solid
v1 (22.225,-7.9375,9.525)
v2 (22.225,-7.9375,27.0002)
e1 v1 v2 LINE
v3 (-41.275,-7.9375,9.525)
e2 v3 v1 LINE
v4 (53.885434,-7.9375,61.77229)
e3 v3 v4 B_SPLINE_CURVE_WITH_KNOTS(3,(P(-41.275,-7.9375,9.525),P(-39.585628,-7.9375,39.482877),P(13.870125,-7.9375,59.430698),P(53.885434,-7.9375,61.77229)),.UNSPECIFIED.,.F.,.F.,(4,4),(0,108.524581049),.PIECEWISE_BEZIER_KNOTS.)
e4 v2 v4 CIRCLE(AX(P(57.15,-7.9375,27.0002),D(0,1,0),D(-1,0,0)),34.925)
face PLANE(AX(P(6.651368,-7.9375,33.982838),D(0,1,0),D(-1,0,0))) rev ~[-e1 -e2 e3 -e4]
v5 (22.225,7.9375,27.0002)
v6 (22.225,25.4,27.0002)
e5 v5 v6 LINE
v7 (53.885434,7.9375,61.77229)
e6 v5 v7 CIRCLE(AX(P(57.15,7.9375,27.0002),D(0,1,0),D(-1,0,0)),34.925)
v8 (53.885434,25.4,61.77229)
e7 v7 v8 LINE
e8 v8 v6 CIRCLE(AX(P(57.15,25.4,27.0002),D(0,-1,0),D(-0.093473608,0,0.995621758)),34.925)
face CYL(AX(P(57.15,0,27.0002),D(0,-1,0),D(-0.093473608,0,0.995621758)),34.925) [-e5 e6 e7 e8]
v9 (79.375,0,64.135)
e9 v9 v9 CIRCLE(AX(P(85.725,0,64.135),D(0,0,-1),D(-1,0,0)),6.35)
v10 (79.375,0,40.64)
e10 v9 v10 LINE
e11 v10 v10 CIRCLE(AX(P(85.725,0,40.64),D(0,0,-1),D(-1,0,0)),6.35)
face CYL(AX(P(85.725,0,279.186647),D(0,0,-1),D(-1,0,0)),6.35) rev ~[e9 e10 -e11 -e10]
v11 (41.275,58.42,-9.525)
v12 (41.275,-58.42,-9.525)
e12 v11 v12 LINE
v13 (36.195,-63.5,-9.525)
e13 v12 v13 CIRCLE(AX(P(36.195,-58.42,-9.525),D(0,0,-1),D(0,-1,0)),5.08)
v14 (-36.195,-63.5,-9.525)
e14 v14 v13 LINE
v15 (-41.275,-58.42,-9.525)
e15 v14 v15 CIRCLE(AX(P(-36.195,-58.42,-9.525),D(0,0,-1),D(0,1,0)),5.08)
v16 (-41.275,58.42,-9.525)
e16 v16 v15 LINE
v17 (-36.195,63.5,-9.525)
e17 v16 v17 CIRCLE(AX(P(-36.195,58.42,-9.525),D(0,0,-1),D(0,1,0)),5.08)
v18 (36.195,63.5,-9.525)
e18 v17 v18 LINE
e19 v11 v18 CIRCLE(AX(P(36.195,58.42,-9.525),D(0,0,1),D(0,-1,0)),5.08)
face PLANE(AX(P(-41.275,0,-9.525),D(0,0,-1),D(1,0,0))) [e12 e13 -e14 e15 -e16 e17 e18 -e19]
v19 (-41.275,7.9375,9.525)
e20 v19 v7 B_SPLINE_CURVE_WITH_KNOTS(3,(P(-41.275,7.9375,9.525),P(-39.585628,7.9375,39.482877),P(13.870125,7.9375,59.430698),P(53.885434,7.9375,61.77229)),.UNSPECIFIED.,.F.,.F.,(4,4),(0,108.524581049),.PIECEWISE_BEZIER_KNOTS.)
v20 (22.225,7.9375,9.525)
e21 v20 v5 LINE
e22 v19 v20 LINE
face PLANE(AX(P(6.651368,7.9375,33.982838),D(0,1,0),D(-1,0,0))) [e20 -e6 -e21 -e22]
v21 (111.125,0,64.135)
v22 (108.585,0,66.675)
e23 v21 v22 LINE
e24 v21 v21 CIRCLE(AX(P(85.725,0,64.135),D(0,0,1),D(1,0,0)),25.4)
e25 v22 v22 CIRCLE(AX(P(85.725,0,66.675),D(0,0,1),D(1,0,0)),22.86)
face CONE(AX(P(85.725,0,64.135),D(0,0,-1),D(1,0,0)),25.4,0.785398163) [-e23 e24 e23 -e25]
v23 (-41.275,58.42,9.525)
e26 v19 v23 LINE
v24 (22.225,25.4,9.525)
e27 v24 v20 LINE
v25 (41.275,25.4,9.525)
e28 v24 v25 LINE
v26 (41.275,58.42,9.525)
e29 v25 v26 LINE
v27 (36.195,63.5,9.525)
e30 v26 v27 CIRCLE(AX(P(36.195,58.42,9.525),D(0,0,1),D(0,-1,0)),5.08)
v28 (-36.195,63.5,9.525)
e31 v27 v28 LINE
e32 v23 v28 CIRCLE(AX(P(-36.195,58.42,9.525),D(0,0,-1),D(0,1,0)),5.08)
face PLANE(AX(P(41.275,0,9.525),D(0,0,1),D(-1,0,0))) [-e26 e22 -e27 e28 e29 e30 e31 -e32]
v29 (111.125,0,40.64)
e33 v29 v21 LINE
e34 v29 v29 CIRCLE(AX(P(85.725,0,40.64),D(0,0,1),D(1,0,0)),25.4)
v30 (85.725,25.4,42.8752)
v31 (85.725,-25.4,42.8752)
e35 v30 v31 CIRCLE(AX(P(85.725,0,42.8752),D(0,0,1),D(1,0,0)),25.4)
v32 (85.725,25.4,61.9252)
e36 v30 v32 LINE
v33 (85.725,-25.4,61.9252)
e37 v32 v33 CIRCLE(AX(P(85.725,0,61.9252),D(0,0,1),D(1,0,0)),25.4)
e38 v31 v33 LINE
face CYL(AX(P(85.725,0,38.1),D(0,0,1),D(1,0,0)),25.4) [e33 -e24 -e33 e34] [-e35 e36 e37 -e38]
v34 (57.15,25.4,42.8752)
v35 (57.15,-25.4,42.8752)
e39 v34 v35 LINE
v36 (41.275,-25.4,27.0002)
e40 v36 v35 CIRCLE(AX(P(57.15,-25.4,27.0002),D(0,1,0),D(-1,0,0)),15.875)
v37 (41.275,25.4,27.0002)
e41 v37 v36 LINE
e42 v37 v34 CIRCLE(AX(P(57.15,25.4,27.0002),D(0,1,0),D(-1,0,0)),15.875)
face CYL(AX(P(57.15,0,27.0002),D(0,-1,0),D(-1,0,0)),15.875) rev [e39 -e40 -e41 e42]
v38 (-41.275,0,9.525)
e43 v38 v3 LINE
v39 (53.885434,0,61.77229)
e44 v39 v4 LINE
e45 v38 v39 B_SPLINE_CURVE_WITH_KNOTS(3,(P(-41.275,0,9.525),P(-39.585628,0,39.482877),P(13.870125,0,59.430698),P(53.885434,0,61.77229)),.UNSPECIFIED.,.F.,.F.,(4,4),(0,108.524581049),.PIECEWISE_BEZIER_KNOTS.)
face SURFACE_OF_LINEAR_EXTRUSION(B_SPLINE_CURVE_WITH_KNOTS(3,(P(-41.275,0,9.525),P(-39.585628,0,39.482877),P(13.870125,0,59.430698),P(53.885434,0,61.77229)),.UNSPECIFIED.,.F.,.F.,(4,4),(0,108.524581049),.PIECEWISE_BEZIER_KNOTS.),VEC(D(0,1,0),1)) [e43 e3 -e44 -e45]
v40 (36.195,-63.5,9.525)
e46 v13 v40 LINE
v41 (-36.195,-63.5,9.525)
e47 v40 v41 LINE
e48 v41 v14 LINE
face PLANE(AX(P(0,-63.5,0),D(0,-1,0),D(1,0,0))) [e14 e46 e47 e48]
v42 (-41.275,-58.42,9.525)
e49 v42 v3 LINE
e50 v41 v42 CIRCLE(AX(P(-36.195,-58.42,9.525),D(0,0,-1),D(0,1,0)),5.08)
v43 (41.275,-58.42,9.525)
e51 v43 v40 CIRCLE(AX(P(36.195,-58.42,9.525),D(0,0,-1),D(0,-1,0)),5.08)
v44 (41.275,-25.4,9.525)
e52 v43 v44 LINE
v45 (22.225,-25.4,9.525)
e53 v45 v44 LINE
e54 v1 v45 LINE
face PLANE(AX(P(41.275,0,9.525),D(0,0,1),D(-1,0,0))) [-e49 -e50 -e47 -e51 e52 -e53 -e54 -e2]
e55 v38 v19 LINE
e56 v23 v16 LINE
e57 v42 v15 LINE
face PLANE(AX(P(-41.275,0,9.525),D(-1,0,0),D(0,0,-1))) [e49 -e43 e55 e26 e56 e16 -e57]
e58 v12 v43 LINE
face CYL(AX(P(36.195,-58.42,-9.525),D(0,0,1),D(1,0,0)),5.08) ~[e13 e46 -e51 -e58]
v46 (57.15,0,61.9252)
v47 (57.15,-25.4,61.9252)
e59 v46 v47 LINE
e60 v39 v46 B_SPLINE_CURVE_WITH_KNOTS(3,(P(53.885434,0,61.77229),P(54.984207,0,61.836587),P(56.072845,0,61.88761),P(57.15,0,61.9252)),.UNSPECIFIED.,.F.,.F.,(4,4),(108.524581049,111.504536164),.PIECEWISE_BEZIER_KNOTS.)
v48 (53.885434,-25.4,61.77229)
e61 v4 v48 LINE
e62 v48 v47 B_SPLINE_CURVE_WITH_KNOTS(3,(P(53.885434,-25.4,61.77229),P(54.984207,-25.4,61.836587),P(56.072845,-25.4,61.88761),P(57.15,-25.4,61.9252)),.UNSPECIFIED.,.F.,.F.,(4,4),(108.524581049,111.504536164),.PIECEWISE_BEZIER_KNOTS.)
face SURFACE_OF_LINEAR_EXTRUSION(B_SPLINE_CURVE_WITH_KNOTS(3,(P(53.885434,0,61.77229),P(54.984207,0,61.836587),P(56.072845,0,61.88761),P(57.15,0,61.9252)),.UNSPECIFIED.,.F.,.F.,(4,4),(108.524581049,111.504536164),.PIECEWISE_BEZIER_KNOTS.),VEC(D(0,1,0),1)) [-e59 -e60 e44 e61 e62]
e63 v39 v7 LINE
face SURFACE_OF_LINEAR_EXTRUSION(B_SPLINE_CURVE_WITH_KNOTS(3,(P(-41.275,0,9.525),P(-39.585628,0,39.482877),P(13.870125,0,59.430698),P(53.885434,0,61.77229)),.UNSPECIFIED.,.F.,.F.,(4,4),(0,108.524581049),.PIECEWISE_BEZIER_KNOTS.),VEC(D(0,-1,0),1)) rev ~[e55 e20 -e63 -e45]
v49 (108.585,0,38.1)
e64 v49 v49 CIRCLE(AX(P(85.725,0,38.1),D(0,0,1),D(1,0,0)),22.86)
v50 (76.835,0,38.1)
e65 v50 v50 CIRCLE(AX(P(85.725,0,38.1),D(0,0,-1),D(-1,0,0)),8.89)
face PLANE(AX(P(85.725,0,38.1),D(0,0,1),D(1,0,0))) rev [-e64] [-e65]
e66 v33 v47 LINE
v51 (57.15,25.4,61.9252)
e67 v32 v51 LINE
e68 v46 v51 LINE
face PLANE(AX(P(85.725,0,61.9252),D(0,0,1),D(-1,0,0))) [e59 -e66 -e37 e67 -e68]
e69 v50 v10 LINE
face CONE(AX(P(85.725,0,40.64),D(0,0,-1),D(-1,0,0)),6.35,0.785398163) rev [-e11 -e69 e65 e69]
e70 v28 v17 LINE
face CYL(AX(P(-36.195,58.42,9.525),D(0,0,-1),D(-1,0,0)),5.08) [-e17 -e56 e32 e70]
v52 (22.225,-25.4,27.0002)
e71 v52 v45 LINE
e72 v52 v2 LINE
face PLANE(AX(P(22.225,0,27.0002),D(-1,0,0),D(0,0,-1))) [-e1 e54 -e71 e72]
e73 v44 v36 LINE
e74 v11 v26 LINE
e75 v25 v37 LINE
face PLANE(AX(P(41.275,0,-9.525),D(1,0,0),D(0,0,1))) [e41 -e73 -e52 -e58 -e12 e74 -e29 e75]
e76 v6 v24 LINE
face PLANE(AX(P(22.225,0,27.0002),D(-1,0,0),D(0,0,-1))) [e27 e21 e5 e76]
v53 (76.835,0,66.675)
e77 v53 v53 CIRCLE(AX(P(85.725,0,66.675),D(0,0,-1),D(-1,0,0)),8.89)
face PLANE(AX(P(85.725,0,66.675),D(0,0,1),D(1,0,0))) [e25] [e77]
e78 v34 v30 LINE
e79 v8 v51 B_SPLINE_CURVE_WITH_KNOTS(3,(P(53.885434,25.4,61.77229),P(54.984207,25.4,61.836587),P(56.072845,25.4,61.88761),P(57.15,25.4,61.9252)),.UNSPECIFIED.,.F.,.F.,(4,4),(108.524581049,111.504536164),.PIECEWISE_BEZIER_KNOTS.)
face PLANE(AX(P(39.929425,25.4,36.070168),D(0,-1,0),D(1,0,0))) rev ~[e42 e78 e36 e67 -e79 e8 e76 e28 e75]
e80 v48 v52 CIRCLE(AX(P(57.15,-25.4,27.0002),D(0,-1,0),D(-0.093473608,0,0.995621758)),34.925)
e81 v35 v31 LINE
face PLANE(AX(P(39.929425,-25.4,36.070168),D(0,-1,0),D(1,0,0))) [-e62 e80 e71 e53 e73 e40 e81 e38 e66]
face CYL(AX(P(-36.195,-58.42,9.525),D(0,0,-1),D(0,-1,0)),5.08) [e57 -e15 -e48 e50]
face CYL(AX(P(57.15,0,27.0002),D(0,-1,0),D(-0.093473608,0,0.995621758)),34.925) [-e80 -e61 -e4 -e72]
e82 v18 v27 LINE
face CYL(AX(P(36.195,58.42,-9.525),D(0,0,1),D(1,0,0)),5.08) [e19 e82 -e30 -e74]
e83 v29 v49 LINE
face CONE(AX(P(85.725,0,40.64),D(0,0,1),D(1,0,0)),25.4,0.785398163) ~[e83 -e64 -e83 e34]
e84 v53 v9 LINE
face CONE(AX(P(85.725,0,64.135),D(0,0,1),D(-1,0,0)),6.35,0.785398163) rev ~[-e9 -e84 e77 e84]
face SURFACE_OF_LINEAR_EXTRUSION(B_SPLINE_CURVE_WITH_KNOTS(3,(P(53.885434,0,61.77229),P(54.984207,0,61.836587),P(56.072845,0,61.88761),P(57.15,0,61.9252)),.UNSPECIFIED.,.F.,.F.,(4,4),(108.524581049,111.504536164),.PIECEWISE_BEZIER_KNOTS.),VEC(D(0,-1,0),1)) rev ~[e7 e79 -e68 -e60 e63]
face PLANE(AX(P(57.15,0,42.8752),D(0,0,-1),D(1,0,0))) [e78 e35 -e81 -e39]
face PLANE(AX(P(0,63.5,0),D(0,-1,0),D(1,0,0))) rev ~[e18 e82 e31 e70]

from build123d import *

# Parameters (mm, degrees)
F1_DEPTH = 63.5
F0_W     = 25.4
F0_H     = 19.05
F2_DEPTH = 25.4
F3_DEPTH = 7.9375
F5_R     = 5.08
F7_D     = 12.7
F8_SIZE  = 2.54


with BuildPart() as f1:
    # F0 (on Front) → F1 (new body, symmetric)
    with BuildSketch(Plane.XZ):
        Polygon((22.225, 9.525), (-41.275, 9.525), (-41.275, -9.525), (41.275, -9.525), (41.275, 9.525), align=None)
    extrude(amount=F1_DEPTH, both=True)

    # F0 (on Front) → F2 (join, symmetric)
    with BuildSketch(Plane.XZ):
        with BuildLine():
            Line((22.225, 27.0002), (22.225, 9.525))
            Line((22.225, 9.525), (41.275, 9.525))
            Line((41.275, 9.525), (41.275, 27.0002))
            ThreePointArc((41.275, 27.0002), (45.9246798487, 38.2255201513), (57.15, 42.8752))
            Line((57.15, 42.8752), (60.325, 42.8752))
            Line((60.325, 42.8752), (60.325, 61.9252))
            Line((60.325, 61.9252), (57.15, 61.9252))
            add(Edge.make_bspline(
                [(53.8854342407, 61.7722898912), (54.9842067368, 61.8365871986), (56.0728453275, 61.8876096574), (57.15, 61.9252)],
                knots=[108.5245810491, 108.5245810491, 108.5245810491, 108.5245810491, 111.5045361635, 111.5045361635, 111.5045361635, 111.5045361635], degree=3))
            ThreePointArc((53.8854342407, 61.7722898912), (31.3258777096, 50.5133948686), (22.225, 27.0002))
        make_face()
        with Locations((73.025, 52.4002)):
            Rectangle(F0_W, F0_H)
    extrude(amount=F2_DEPTH, both=True)

    # F0 (on Front) → F3 (join, symmetric)
    with BuildSketch(Plane.XZ):
        with BuildLine():
            add(Edge.make_bspline(
                [(-41.275, 9.525), (-39.5856284224, 39.4828766469), (13.870125209, 59.4306981306), (53.8854342407, 61.7722898912)],
                knots=[0, 0, 0, 0, 108.5245810491, 108.5245810491, 108.5245810491, 108.5245810491], degree=3))
            Line((-41.275, 9.525), (22.225, 9.525))
            Line((22.225, 9.525), (22.225, 27.0002))
            ThreePointArc((22.225, 27.0002), (31.3258777096, 50.5133948686), (53.8854342407, 61.7722898912))
        make_face()
    extrude(amount=F3_DEPTH, both=True)

    # F0 (on Front) → F4 (revolve)
    with BuildSketch(Plane.XZ):
        Polygon((85.725, 66.675), (85.725, 61.9252), (85.725, 42.8752), (85.725, 38.1), (111.125, 38.1), (111.125, 66.675), align=None)
    revolve(axis=Axis((85.725, 0, 52.3875), (0, 0, 1)))

    # F5
    f5_edges = [f1.edges().sort_by_distance(p)[0] for p in [
        (41.275, -63.5, 0),
        (-41.275, -63.5, 0),
        (41.275, 63.5, 0),
        (-41.275, 63.5, 0),
    ]]
    fillet(f5_edges, radius=F5_R)

    # F7 (through all)
    with Locations(Plane.XY.offset(66.675)):
        with Locations((85.725, 0)):
            Hole(F7_D / 2)

    # F8
    f8_edges = [f1.edges().sort_by_distance(p)[0] for p in [
        (60.325, 0, 66.675),
        (60.325, 0, 38.1),
        (79.375, 0, 66.675),
        (79.375, 0, 38.1),
    ]]
    chamfer(f8_edges, length=F8_SIZE)


solid = f1.part
